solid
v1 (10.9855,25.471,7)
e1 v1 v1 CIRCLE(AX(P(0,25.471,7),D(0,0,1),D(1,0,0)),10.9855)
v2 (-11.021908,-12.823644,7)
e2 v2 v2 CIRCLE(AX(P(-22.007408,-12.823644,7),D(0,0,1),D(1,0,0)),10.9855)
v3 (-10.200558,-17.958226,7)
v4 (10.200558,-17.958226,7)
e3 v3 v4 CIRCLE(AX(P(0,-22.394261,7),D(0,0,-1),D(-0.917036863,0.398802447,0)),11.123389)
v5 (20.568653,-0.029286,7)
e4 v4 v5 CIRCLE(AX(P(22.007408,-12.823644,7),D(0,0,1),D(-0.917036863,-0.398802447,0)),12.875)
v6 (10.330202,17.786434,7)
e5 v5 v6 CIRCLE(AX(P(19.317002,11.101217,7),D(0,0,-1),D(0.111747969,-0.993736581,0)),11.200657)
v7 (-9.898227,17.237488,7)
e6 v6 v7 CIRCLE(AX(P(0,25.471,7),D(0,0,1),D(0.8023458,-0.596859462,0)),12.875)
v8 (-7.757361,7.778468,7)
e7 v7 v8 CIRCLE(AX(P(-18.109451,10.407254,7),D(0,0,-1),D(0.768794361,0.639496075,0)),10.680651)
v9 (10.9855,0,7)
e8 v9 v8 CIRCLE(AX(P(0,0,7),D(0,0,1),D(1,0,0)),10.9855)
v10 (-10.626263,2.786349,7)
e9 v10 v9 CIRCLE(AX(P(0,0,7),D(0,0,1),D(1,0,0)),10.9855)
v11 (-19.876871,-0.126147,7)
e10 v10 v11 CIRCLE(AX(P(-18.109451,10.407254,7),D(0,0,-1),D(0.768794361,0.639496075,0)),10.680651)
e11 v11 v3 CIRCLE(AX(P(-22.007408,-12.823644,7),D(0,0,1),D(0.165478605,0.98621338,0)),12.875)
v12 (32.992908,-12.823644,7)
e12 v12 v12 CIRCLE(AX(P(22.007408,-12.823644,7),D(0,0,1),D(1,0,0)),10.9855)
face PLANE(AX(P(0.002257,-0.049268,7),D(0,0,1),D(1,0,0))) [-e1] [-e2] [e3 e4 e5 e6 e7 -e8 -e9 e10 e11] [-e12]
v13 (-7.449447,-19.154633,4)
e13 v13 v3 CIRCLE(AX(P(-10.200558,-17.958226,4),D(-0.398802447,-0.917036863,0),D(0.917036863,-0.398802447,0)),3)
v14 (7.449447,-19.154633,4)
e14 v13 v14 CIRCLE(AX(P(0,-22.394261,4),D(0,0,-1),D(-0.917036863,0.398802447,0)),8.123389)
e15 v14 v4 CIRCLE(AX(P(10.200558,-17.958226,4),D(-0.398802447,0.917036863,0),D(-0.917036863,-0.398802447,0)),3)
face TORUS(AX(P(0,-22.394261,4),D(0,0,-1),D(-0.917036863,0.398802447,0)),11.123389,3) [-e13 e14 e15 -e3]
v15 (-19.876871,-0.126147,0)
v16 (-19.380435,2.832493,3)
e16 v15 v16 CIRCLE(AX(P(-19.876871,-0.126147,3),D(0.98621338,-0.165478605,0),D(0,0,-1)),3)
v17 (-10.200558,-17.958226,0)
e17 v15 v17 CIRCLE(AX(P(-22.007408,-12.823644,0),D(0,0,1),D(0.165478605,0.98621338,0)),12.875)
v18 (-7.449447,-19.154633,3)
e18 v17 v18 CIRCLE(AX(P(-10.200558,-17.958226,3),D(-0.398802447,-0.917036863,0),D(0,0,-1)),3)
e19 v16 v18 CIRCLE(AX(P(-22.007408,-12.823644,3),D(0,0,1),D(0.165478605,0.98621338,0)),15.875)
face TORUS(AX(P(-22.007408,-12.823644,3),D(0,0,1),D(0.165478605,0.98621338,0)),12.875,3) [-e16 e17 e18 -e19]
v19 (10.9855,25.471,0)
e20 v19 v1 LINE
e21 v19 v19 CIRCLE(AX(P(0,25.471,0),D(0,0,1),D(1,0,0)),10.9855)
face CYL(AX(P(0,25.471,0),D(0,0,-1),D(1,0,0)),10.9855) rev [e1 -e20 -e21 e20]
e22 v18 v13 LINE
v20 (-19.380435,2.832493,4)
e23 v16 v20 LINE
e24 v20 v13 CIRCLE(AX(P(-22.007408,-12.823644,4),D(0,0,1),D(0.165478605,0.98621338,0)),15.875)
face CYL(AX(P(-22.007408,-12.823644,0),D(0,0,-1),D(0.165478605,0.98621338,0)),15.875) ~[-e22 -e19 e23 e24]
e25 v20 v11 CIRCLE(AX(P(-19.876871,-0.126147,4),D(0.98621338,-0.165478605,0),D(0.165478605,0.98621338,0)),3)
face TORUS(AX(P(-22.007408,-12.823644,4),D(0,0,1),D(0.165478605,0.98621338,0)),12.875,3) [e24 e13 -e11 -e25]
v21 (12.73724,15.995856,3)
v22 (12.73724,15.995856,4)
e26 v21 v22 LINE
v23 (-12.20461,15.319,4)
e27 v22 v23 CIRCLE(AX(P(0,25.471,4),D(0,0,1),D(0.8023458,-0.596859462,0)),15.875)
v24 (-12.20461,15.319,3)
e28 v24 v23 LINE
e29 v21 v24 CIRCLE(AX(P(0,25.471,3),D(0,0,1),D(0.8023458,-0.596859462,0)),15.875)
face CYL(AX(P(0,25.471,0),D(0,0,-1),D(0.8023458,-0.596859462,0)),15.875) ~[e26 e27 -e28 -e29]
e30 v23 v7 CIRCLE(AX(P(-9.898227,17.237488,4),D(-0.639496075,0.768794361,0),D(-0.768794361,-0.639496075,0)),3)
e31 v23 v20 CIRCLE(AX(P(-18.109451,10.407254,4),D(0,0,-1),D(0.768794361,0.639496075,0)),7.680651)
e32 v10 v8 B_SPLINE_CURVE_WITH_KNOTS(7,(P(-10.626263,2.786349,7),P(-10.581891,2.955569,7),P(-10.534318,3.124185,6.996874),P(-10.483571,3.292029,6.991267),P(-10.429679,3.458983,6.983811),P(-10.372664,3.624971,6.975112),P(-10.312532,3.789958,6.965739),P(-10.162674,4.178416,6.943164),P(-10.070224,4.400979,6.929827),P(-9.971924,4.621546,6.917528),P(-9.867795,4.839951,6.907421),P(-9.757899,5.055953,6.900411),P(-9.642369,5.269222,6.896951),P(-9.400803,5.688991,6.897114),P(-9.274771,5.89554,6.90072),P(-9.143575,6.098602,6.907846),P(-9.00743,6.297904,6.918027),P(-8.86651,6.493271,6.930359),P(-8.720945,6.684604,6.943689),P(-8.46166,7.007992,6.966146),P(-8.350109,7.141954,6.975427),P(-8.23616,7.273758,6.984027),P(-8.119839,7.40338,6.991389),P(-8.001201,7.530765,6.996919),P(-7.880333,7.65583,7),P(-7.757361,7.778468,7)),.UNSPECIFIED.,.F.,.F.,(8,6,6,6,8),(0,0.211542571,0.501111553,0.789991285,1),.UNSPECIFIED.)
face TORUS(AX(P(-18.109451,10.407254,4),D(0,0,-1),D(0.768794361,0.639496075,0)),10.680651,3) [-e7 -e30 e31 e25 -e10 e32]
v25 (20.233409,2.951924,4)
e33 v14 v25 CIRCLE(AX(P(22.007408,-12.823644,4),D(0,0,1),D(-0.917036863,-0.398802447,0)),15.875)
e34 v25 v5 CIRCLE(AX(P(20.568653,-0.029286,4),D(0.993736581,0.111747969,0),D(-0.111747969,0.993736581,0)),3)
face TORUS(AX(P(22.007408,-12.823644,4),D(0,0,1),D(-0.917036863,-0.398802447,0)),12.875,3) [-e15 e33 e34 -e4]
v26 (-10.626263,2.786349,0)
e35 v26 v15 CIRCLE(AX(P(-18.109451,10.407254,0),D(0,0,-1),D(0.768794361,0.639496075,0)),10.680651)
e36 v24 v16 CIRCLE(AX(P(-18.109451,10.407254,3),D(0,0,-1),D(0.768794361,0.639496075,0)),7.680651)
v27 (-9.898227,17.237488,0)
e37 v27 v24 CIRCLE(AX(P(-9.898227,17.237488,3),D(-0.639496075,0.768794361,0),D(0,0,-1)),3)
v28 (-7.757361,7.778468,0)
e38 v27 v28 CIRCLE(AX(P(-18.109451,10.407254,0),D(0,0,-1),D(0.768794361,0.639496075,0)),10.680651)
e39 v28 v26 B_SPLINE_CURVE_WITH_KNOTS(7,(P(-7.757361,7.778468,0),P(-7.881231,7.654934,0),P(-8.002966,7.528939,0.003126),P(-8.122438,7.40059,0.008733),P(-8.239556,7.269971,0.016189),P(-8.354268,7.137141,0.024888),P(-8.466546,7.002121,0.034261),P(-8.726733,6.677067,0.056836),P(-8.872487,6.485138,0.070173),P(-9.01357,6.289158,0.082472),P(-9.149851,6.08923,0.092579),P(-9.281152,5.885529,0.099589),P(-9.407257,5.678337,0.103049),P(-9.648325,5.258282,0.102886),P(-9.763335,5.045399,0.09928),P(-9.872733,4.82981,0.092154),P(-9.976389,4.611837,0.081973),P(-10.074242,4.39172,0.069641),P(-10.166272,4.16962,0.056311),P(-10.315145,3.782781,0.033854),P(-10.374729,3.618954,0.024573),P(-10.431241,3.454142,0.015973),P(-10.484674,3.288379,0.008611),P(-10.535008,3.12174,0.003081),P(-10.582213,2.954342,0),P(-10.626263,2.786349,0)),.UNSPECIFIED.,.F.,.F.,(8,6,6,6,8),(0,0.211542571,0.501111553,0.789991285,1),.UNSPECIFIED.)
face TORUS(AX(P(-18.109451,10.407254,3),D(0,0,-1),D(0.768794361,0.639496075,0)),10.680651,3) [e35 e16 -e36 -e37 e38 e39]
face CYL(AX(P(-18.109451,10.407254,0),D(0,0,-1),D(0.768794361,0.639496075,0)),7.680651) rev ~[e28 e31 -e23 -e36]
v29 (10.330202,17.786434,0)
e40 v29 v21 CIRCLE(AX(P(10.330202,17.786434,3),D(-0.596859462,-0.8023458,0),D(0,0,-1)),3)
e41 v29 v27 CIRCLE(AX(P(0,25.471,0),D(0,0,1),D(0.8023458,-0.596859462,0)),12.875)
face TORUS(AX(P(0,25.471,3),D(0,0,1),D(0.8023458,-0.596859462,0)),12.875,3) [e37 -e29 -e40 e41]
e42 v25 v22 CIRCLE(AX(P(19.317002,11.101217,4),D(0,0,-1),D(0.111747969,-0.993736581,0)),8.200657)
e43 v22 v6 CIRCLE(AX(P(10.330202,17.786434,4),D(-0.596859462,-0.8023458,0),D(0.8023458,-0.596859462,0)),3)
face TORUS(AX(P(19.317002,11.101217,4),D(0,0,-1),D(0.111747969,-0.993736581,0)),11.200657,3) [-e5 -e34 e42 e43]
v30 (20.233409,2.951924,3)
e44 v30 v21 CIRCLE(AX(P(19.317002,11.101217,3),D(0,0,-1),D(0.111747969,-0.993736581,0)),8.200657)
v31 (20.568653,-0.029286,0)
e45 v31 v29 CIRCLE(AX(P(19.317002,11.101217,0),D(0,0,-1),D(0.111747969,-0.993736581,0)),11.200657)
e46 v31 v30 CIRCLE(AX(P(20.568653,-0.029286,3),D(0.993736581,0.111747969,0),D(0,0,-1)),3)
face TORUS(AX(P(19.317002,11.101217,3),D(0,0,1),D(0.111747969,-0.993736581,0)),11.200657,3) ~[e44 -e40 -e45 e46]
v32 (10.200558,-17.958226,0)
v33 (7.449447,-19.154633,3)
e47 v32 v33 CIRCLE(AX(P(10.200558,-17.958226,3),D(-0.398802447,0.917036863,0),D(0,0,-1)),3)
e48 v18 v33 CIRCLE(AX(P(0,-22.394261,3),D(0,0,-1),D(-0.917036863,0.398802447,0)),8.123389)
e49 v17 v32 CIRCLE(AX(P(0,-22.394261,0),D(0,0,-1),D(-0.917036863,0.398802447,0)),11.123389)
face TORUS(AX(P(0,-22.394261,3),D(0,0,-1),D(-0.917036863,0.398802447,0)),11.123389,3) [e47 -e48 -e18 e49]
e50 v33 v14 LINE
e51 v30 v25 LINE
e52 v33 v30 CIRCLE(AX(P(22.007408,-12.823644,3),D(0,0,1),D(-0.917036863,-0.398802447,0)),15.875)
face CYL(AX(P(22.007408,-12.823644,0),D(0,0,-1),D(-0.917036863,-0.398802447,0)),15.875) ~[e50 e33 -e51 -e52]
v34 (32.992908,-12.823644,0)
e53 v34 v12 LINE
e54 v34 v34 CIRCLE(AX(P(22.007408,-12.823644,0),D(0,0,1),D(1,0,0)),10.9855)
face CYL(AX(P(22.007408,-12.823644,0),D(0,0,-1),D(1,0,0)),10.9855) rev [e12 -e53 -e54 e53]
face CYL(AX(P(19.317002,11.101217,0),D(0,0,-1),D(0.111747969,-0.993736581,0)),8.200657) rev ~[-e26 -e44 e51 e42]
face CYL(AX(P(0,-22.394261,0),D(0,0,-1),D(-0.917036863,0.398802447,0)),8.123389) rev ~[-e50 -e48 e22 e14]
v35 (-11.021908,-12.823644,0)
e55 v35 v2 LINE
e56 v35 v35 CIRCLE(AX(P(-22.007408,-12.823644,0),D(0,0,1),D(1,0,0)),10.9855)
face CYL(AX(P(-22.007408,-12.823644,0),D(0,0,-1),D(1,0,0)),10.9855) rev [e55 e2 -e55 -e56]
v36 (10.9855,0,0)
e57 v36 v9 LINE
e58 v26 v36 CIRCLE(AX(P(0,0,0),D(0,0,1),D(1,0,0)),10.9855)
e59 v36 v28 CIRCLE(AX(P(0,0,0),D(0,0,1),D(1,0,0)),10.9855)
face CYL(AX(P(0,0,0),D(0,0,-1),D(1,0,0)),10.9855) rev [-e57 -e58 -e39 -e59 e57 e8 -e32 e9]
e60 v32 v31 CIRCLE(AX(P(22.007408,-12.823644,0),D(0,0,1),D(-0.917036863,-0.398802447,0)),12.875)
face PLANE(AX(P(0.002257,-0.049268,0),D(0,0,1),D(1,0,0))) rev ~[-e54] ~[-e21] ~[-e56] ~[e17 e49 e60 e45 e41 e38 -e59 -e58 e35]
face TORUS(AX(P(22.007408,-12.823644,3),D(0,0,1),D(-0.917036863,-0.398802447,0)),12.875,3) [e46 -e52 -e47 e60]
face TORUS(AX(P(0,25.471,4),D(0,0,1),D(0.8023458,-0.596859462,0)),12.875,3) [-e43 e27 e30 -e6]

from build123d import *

# Parameters (mm, degrees)
F0_R         = 10.9855
F1_DEPTH     = 7
F2_T3_ANGLE  = 256.3995561368
F2_T6_ANGLE  = 256.0217037288
F2_T9_ANGLE  = 252.9127531636
F2_T12_ANGLE = 132.9933300565
F2_T15_ANGLE = 133.0613909212
F2_T18_ANGLE = 139.2792920515
F3_T2_ANGLE  = 256.3995561368
F3_T4_ANGLE  = 252.9127531636
F3_T6_ANGLE  = 256.0217037288
F3_T8_ANGLE  = 133.0613909212
F3_T10_ANGLE = 139.2792920515
F3_T12_ANGLE = 132.9933300565


# Not quite as in the source:
# - a fillet or chamfer that OpenCascade refuses, or shapes differently, is made with other operations: its cross-section is extruded or revolved along the edge and cut away or added
# - a feature names something its author has since deleted; it is built from what else it names


with BuildPart() as f1:
    # F0 (on Top) → F1 (new body)
    with BuildSketch(Plane.XY):
        with BuildLine():
            ThreePointArc((20.233408665, 2.951924091), (12.2068374294, 7.0151023416), (12.7372395679, 15.9958560332))
            ThreePointArc((12.7372395679, 15.9958560332), (-0.4306472142, 41.3401577589), (-12.2046104843, 15.3189998066))
            ThreePointArc((-12.2046104843, 15.3189998066), (-11.4501444105, 6.5802412239), (-19.3804348229, 2.8324932871))
            ThreePointArc((-19.3804348229, 2.8324932871), (-35.9605045031, -20.3950847915), (-7.4494474677, -19.1546329687))
            ThreePointArc((-7.4494474677, -19.1546329687), (0, -14.2708711815), (7.4494474677, -19.1546329687))
            ThreePointArc((7.4494474677, -19.1546329687), (35.7499761764, -20.7708093962), (20.233408665, 2.951924091))
        make_face()
        with Locations((-22.0074076702, -12.8236441247)):
            Circle(F0_R, mode=Mode.SUBTRACT)
        with Locations((22.0074076702, -12.8236441247)):
            Circle(F0_R, mode=Mode.SUBTRACT)
        Circle(F0_R, mode=Mode.SUBTRACT)
        with Locations((0, 25.471)):
            Circle(F0_R, mode=Mode.SUBTRACT)
    extrude(amount=F1_DEPTH)

    # F2: fillet of radius 3 on 3 edges, made by hand


with BuildPart() as f2_tool1:
    # F2_s2 → F2_t3 (revolve)
    with BuildSketch(Plane(origin=(12.1977481645, 16.3971799378, 0), x_dir=(0, 0, 1), z_dir=(-0.5968594625, -0.8023457996, 0))):
        with BuildLine():
            ThreePointArc((4, -0.6723926313), (6.1213203436, 0.2062870251), (7, 2.3276073687))
            Line((7, 2.3276073687), (7, -0.6723926313))
            Line((7, -0.6723926313), (4, -0.6723926313))
        make_face()
    revolve(axis=Axis((0, 25.471, 7), (0, 0, 1)), revolution_arc=F2_T3_ANGLE)


with BuildPart() as f2_tool4:
    # F2_s5 → F2_t6 (revolve)
    with BuildSketch(Plane(origin=(-19.3119921223, 3.2403956096, 0), x_dir=(0, 0, 1), z_dir=(0.9862133803, -0.1654786046, 0))):
        with BuildLine():
            ThreePointArc((4, 0.4136045308), (6.1213203436, 1.2922841872), (7, 3.4136045308))
            Line((7, 3.4136045308), (7, 0.4136045308))
            Line((7, 0.4136045308), (4, 0.4136045308))
        make_face()
    revolve(axis=Axis((-22.0074076702, -12.8236441247, 7), (0, 0, 1)), revolution_arc=F2_T6_ANGLE)


with BuildPart() as f2_tool7:
    # F2_s8 → F2_t9 (revolve)
    with BuildSketch(Plane(origin=(8.189951579, -18.8326013653, 0), x_dir=(0, 0, 1), z_dir=(-0.3988024469, 0.9170368631, 0))):
        with BuildLine():
            ThreePointArc((4, -0.8074965588), (6.1213203436, 0.0711830977), (7, 2.1925034412))
            Line((7, 2.1925034412), (7, -0.8074965588))
            Line((7, -0.8074965588), (4, -0.8074965588))
        make_face()
    revolve(axis=Axis((22.0074076702, -12.8236441247, 7), (0, 0, 1)), revolution_arc=F2_T9_ANGLE)


with BuildPart() as f2_tool10:
    # F2_s11 → F2_t12 (revolve)
    with BuildSketch(Plane(origin=(-8.189951579, -18.8326013653, 0), x_dir=(0, 0, 1), z_dir=(-0.3988024469, -0.9170368631, 0))):
        with BuildLine():
            ThreePointArc((4, -0.8074965588), (6.1213203436, 0.0711830977), (7, 2.1925034412))
            Line((7, 2.1925034412), (7, -0.8074965588))
            Line((7, -0.8074965588), (4, -0.8074965588))
        make_face()
    revolve(axis=Axis((0, -22.3942605097, 7), (0, 0, -1)), revolution_arc=F2_T12_ANGLE)


with BuildPart() as f2_tool13:
    # F2_s14 → F2_t15 (revolve)
    with BuildSketch(Plane(origin=(20.3085471758, 2.2837429368, 0), x_dir=(0, 0, 1), z_dir=(0.9937365805, 0.1117479688, 0))):
        with BuildLine():
            ThreePointArc((4, -0.6723926313), (6.1213203436, 0.2062870251), (7, 2.3276073687))
            Line((7, 2.3276073687), (7, -0.6723926313))
            Line((7, -0.6723926313), (4, -0.6723926313))
        make_face()
    revolve(axis=Axis((19.3170019466, 11.1012165414, 7), (0, 0, -1)), revolution_arc=F2_T15_ANGLE)


with BuildPart() as f2_tool16:
    # F2_s17 → F2_t18 (revolve)
    with BuildSketch(Plane(origin=(-12.5225873153, 15.0545013325, 0), x_dir=(0, 0, 1), z_dir=(-0.6394960752, 0.7687943612, 0))):
        with BuildLine():
            ThreePointArc((4, 0.4136045308), (6.1213203436, 1.2922841872), (7, 3.4136045308))
            Line((7, 3.4136045308), (7, 0.4136045308))
            Line((7, 0.4136045308), (4, 0.4136045308))
        make_face()
    revolve(axis=Axis((-18.1094514577, 10.4072538085, 7), (0, 0, -1)), revolution_arc=F2_T18_ANGLE)


with BuildPart() as f1_1:
    add(f1.part)

    # F2_t19: cut F2_tool1, F2_tool4, F2_tool7, F2_tool10, F2_tool13, F2_tool16
    add([f2_tool1.part, f2_tool4.part, f2_tool7.part, f2_tool10.part, f2_tool13.part, f2_tool16.part], mode=Mode.SUBTRACT)

    # F3: fillet of radius 3 on 6 edges, made by hand

    # F3_s1 → F3_t2 (revolve, cut)
    with BuildSketch(Plane(origin=(12.1977481645, 16.3971799378, 0), x_dir=(0, 0, 1), z_dir=(-0.5968594625, -0.8023457996, 0))):
        with BuildLine():
            ThreePointArc((0, 2.3276073687), (0.8786796564, 0.2062870251), (3, -0.6723926313))
            Line((3, -0.6723926313), (0, -0.6723926313))
            Line((0, -0.6723926313), (0, 2.3276073687))
        make_face()
    revolve(axis=Axis((0, 25.471, 0), (0, 0, 1)), revolution_arc=F3_T2_ANGLE, mode=Mode.SUBTRACT)

    # F3_s3 → F3_t4 (revolve, cut)
    with BuildSketch(Plane(origin=(8.189951579, -18.8326013653, 0), x_dir=(0, 0, 1), z_dir=(-0.3988024469, 0.9170368631, 0))):
        with BuildLine():
            ThreePointArc((0, 2.1925034412), (0.8786796564, 0.0711830977), (3, -0.8074965588))
            Line((3, -0.8074965588), (0, -0.8074965588))
            Line((0, -0.8074965588), (0, 2.1925034412))
        make_face()
    revolve(axis=Axis((22.0074076702, -12.8236441247, 0), (0, 0, 1)), revolution_arc=F3_T4_ANGLE, mode=Mode.SUBTRACT)

    # F3_s5 → F3_t6 (revolve, cut)
    with BuildSketch(Plane(origin=(-19.3119921223, 3.2403956096, 0), x_dir=(0, 0, 1), z_dir=(0.9862133803, -0.1654786046, 0))):
        with BuildLine():
            ThreePointArc((0, 3.4136045308), (0.8786796564, 1.2922841872), (3, 0.4136045308))
            Line((3, 0.4136045308), (0, 0.4136045308))
            Line((0, 0.4136045308), (0, 3.4136045308))
        make_face()
    revolve(axis=Axis((-22.0074076702, -12.8236441247, 0), (0, 0, 1)), revolution_arc=F3_T6_ANGLE, mode=Mode.SUBTRACT)

    # F3_s7 → F3_t8 (revolve, cut)
    with BuildSketch(Plane(origin=(20.3085471758, 2.2837429368, 0), x_dir=(0, 0, 1), z_dir=(0.9937365805, 0.1117479688, 0))):
        with BuildLine():
            ThreePointArc((3, -0.6723926313), (0.8786796564, 0.2062870251), (0, 2.3276073687))
            Line((0, 2.3276073687), (0, -0.6723926313))
            Line((0, -0.6723926313), (3, -0.6723926313))
        make_face()
    revolve(axis=Axis((19.3170019466, 11.1012165414, 0), (0, 0, -1)), revolution_arc=F3_T8_ANGLE, mode=Mode.SUBTRACT)

    # F3_s9 → F3_t10 (revolve, cut)
    with BuildSketch(Plane(origin=(-12.5225873153, 15.0545013325, 0), x_dir=(0, 0, 1), z_dir=(-0.6394960752, 0.7687943612, 0))):
        with BuildLine():
            ThreePointArc((0, 3.4136045308), (0.8786796564, 1.2922841872), (3, 0.4136045308))
            Line((3, 0.4136045308), (0, 0.4136045308))
            Line((0, 0.4136045308), (0, 3.4136045308))
        make_face()
    revolve(axis=Axis((-18.1094514577, 10.4072538085, 0), (0, 0, -1)), revolution_arc=F3_T10_ANGLE, mode=Mode.SUBTRACT)

    # F3_s11 → F3_t12 (revolve, cut)
    with BuildSketch(Plane(origin=(-8.189951579, -18.8326013653, 0), x_dir=(0, 0, 1), z_dir=(-0.3988024469, -0.9170368631, 0))):
        with BuildLine():
            ThreePointArc((0, 2.1925034412), (0.8786796564, 0.0711830977), (3, -0.8074965588))
            Line((3, -0.8074965588), (0, -0.8074965588))
            Line((0, -0.8074965588), (0, 2.1925034412))
        make_face()
    revolve(axis=Axis((0, -22.3942605097, 0), (0, 0, -1)), revolution_arc=F3_T12_ANGLE, mode=Mode.SUBTRACT)


solid = f1_1.part
